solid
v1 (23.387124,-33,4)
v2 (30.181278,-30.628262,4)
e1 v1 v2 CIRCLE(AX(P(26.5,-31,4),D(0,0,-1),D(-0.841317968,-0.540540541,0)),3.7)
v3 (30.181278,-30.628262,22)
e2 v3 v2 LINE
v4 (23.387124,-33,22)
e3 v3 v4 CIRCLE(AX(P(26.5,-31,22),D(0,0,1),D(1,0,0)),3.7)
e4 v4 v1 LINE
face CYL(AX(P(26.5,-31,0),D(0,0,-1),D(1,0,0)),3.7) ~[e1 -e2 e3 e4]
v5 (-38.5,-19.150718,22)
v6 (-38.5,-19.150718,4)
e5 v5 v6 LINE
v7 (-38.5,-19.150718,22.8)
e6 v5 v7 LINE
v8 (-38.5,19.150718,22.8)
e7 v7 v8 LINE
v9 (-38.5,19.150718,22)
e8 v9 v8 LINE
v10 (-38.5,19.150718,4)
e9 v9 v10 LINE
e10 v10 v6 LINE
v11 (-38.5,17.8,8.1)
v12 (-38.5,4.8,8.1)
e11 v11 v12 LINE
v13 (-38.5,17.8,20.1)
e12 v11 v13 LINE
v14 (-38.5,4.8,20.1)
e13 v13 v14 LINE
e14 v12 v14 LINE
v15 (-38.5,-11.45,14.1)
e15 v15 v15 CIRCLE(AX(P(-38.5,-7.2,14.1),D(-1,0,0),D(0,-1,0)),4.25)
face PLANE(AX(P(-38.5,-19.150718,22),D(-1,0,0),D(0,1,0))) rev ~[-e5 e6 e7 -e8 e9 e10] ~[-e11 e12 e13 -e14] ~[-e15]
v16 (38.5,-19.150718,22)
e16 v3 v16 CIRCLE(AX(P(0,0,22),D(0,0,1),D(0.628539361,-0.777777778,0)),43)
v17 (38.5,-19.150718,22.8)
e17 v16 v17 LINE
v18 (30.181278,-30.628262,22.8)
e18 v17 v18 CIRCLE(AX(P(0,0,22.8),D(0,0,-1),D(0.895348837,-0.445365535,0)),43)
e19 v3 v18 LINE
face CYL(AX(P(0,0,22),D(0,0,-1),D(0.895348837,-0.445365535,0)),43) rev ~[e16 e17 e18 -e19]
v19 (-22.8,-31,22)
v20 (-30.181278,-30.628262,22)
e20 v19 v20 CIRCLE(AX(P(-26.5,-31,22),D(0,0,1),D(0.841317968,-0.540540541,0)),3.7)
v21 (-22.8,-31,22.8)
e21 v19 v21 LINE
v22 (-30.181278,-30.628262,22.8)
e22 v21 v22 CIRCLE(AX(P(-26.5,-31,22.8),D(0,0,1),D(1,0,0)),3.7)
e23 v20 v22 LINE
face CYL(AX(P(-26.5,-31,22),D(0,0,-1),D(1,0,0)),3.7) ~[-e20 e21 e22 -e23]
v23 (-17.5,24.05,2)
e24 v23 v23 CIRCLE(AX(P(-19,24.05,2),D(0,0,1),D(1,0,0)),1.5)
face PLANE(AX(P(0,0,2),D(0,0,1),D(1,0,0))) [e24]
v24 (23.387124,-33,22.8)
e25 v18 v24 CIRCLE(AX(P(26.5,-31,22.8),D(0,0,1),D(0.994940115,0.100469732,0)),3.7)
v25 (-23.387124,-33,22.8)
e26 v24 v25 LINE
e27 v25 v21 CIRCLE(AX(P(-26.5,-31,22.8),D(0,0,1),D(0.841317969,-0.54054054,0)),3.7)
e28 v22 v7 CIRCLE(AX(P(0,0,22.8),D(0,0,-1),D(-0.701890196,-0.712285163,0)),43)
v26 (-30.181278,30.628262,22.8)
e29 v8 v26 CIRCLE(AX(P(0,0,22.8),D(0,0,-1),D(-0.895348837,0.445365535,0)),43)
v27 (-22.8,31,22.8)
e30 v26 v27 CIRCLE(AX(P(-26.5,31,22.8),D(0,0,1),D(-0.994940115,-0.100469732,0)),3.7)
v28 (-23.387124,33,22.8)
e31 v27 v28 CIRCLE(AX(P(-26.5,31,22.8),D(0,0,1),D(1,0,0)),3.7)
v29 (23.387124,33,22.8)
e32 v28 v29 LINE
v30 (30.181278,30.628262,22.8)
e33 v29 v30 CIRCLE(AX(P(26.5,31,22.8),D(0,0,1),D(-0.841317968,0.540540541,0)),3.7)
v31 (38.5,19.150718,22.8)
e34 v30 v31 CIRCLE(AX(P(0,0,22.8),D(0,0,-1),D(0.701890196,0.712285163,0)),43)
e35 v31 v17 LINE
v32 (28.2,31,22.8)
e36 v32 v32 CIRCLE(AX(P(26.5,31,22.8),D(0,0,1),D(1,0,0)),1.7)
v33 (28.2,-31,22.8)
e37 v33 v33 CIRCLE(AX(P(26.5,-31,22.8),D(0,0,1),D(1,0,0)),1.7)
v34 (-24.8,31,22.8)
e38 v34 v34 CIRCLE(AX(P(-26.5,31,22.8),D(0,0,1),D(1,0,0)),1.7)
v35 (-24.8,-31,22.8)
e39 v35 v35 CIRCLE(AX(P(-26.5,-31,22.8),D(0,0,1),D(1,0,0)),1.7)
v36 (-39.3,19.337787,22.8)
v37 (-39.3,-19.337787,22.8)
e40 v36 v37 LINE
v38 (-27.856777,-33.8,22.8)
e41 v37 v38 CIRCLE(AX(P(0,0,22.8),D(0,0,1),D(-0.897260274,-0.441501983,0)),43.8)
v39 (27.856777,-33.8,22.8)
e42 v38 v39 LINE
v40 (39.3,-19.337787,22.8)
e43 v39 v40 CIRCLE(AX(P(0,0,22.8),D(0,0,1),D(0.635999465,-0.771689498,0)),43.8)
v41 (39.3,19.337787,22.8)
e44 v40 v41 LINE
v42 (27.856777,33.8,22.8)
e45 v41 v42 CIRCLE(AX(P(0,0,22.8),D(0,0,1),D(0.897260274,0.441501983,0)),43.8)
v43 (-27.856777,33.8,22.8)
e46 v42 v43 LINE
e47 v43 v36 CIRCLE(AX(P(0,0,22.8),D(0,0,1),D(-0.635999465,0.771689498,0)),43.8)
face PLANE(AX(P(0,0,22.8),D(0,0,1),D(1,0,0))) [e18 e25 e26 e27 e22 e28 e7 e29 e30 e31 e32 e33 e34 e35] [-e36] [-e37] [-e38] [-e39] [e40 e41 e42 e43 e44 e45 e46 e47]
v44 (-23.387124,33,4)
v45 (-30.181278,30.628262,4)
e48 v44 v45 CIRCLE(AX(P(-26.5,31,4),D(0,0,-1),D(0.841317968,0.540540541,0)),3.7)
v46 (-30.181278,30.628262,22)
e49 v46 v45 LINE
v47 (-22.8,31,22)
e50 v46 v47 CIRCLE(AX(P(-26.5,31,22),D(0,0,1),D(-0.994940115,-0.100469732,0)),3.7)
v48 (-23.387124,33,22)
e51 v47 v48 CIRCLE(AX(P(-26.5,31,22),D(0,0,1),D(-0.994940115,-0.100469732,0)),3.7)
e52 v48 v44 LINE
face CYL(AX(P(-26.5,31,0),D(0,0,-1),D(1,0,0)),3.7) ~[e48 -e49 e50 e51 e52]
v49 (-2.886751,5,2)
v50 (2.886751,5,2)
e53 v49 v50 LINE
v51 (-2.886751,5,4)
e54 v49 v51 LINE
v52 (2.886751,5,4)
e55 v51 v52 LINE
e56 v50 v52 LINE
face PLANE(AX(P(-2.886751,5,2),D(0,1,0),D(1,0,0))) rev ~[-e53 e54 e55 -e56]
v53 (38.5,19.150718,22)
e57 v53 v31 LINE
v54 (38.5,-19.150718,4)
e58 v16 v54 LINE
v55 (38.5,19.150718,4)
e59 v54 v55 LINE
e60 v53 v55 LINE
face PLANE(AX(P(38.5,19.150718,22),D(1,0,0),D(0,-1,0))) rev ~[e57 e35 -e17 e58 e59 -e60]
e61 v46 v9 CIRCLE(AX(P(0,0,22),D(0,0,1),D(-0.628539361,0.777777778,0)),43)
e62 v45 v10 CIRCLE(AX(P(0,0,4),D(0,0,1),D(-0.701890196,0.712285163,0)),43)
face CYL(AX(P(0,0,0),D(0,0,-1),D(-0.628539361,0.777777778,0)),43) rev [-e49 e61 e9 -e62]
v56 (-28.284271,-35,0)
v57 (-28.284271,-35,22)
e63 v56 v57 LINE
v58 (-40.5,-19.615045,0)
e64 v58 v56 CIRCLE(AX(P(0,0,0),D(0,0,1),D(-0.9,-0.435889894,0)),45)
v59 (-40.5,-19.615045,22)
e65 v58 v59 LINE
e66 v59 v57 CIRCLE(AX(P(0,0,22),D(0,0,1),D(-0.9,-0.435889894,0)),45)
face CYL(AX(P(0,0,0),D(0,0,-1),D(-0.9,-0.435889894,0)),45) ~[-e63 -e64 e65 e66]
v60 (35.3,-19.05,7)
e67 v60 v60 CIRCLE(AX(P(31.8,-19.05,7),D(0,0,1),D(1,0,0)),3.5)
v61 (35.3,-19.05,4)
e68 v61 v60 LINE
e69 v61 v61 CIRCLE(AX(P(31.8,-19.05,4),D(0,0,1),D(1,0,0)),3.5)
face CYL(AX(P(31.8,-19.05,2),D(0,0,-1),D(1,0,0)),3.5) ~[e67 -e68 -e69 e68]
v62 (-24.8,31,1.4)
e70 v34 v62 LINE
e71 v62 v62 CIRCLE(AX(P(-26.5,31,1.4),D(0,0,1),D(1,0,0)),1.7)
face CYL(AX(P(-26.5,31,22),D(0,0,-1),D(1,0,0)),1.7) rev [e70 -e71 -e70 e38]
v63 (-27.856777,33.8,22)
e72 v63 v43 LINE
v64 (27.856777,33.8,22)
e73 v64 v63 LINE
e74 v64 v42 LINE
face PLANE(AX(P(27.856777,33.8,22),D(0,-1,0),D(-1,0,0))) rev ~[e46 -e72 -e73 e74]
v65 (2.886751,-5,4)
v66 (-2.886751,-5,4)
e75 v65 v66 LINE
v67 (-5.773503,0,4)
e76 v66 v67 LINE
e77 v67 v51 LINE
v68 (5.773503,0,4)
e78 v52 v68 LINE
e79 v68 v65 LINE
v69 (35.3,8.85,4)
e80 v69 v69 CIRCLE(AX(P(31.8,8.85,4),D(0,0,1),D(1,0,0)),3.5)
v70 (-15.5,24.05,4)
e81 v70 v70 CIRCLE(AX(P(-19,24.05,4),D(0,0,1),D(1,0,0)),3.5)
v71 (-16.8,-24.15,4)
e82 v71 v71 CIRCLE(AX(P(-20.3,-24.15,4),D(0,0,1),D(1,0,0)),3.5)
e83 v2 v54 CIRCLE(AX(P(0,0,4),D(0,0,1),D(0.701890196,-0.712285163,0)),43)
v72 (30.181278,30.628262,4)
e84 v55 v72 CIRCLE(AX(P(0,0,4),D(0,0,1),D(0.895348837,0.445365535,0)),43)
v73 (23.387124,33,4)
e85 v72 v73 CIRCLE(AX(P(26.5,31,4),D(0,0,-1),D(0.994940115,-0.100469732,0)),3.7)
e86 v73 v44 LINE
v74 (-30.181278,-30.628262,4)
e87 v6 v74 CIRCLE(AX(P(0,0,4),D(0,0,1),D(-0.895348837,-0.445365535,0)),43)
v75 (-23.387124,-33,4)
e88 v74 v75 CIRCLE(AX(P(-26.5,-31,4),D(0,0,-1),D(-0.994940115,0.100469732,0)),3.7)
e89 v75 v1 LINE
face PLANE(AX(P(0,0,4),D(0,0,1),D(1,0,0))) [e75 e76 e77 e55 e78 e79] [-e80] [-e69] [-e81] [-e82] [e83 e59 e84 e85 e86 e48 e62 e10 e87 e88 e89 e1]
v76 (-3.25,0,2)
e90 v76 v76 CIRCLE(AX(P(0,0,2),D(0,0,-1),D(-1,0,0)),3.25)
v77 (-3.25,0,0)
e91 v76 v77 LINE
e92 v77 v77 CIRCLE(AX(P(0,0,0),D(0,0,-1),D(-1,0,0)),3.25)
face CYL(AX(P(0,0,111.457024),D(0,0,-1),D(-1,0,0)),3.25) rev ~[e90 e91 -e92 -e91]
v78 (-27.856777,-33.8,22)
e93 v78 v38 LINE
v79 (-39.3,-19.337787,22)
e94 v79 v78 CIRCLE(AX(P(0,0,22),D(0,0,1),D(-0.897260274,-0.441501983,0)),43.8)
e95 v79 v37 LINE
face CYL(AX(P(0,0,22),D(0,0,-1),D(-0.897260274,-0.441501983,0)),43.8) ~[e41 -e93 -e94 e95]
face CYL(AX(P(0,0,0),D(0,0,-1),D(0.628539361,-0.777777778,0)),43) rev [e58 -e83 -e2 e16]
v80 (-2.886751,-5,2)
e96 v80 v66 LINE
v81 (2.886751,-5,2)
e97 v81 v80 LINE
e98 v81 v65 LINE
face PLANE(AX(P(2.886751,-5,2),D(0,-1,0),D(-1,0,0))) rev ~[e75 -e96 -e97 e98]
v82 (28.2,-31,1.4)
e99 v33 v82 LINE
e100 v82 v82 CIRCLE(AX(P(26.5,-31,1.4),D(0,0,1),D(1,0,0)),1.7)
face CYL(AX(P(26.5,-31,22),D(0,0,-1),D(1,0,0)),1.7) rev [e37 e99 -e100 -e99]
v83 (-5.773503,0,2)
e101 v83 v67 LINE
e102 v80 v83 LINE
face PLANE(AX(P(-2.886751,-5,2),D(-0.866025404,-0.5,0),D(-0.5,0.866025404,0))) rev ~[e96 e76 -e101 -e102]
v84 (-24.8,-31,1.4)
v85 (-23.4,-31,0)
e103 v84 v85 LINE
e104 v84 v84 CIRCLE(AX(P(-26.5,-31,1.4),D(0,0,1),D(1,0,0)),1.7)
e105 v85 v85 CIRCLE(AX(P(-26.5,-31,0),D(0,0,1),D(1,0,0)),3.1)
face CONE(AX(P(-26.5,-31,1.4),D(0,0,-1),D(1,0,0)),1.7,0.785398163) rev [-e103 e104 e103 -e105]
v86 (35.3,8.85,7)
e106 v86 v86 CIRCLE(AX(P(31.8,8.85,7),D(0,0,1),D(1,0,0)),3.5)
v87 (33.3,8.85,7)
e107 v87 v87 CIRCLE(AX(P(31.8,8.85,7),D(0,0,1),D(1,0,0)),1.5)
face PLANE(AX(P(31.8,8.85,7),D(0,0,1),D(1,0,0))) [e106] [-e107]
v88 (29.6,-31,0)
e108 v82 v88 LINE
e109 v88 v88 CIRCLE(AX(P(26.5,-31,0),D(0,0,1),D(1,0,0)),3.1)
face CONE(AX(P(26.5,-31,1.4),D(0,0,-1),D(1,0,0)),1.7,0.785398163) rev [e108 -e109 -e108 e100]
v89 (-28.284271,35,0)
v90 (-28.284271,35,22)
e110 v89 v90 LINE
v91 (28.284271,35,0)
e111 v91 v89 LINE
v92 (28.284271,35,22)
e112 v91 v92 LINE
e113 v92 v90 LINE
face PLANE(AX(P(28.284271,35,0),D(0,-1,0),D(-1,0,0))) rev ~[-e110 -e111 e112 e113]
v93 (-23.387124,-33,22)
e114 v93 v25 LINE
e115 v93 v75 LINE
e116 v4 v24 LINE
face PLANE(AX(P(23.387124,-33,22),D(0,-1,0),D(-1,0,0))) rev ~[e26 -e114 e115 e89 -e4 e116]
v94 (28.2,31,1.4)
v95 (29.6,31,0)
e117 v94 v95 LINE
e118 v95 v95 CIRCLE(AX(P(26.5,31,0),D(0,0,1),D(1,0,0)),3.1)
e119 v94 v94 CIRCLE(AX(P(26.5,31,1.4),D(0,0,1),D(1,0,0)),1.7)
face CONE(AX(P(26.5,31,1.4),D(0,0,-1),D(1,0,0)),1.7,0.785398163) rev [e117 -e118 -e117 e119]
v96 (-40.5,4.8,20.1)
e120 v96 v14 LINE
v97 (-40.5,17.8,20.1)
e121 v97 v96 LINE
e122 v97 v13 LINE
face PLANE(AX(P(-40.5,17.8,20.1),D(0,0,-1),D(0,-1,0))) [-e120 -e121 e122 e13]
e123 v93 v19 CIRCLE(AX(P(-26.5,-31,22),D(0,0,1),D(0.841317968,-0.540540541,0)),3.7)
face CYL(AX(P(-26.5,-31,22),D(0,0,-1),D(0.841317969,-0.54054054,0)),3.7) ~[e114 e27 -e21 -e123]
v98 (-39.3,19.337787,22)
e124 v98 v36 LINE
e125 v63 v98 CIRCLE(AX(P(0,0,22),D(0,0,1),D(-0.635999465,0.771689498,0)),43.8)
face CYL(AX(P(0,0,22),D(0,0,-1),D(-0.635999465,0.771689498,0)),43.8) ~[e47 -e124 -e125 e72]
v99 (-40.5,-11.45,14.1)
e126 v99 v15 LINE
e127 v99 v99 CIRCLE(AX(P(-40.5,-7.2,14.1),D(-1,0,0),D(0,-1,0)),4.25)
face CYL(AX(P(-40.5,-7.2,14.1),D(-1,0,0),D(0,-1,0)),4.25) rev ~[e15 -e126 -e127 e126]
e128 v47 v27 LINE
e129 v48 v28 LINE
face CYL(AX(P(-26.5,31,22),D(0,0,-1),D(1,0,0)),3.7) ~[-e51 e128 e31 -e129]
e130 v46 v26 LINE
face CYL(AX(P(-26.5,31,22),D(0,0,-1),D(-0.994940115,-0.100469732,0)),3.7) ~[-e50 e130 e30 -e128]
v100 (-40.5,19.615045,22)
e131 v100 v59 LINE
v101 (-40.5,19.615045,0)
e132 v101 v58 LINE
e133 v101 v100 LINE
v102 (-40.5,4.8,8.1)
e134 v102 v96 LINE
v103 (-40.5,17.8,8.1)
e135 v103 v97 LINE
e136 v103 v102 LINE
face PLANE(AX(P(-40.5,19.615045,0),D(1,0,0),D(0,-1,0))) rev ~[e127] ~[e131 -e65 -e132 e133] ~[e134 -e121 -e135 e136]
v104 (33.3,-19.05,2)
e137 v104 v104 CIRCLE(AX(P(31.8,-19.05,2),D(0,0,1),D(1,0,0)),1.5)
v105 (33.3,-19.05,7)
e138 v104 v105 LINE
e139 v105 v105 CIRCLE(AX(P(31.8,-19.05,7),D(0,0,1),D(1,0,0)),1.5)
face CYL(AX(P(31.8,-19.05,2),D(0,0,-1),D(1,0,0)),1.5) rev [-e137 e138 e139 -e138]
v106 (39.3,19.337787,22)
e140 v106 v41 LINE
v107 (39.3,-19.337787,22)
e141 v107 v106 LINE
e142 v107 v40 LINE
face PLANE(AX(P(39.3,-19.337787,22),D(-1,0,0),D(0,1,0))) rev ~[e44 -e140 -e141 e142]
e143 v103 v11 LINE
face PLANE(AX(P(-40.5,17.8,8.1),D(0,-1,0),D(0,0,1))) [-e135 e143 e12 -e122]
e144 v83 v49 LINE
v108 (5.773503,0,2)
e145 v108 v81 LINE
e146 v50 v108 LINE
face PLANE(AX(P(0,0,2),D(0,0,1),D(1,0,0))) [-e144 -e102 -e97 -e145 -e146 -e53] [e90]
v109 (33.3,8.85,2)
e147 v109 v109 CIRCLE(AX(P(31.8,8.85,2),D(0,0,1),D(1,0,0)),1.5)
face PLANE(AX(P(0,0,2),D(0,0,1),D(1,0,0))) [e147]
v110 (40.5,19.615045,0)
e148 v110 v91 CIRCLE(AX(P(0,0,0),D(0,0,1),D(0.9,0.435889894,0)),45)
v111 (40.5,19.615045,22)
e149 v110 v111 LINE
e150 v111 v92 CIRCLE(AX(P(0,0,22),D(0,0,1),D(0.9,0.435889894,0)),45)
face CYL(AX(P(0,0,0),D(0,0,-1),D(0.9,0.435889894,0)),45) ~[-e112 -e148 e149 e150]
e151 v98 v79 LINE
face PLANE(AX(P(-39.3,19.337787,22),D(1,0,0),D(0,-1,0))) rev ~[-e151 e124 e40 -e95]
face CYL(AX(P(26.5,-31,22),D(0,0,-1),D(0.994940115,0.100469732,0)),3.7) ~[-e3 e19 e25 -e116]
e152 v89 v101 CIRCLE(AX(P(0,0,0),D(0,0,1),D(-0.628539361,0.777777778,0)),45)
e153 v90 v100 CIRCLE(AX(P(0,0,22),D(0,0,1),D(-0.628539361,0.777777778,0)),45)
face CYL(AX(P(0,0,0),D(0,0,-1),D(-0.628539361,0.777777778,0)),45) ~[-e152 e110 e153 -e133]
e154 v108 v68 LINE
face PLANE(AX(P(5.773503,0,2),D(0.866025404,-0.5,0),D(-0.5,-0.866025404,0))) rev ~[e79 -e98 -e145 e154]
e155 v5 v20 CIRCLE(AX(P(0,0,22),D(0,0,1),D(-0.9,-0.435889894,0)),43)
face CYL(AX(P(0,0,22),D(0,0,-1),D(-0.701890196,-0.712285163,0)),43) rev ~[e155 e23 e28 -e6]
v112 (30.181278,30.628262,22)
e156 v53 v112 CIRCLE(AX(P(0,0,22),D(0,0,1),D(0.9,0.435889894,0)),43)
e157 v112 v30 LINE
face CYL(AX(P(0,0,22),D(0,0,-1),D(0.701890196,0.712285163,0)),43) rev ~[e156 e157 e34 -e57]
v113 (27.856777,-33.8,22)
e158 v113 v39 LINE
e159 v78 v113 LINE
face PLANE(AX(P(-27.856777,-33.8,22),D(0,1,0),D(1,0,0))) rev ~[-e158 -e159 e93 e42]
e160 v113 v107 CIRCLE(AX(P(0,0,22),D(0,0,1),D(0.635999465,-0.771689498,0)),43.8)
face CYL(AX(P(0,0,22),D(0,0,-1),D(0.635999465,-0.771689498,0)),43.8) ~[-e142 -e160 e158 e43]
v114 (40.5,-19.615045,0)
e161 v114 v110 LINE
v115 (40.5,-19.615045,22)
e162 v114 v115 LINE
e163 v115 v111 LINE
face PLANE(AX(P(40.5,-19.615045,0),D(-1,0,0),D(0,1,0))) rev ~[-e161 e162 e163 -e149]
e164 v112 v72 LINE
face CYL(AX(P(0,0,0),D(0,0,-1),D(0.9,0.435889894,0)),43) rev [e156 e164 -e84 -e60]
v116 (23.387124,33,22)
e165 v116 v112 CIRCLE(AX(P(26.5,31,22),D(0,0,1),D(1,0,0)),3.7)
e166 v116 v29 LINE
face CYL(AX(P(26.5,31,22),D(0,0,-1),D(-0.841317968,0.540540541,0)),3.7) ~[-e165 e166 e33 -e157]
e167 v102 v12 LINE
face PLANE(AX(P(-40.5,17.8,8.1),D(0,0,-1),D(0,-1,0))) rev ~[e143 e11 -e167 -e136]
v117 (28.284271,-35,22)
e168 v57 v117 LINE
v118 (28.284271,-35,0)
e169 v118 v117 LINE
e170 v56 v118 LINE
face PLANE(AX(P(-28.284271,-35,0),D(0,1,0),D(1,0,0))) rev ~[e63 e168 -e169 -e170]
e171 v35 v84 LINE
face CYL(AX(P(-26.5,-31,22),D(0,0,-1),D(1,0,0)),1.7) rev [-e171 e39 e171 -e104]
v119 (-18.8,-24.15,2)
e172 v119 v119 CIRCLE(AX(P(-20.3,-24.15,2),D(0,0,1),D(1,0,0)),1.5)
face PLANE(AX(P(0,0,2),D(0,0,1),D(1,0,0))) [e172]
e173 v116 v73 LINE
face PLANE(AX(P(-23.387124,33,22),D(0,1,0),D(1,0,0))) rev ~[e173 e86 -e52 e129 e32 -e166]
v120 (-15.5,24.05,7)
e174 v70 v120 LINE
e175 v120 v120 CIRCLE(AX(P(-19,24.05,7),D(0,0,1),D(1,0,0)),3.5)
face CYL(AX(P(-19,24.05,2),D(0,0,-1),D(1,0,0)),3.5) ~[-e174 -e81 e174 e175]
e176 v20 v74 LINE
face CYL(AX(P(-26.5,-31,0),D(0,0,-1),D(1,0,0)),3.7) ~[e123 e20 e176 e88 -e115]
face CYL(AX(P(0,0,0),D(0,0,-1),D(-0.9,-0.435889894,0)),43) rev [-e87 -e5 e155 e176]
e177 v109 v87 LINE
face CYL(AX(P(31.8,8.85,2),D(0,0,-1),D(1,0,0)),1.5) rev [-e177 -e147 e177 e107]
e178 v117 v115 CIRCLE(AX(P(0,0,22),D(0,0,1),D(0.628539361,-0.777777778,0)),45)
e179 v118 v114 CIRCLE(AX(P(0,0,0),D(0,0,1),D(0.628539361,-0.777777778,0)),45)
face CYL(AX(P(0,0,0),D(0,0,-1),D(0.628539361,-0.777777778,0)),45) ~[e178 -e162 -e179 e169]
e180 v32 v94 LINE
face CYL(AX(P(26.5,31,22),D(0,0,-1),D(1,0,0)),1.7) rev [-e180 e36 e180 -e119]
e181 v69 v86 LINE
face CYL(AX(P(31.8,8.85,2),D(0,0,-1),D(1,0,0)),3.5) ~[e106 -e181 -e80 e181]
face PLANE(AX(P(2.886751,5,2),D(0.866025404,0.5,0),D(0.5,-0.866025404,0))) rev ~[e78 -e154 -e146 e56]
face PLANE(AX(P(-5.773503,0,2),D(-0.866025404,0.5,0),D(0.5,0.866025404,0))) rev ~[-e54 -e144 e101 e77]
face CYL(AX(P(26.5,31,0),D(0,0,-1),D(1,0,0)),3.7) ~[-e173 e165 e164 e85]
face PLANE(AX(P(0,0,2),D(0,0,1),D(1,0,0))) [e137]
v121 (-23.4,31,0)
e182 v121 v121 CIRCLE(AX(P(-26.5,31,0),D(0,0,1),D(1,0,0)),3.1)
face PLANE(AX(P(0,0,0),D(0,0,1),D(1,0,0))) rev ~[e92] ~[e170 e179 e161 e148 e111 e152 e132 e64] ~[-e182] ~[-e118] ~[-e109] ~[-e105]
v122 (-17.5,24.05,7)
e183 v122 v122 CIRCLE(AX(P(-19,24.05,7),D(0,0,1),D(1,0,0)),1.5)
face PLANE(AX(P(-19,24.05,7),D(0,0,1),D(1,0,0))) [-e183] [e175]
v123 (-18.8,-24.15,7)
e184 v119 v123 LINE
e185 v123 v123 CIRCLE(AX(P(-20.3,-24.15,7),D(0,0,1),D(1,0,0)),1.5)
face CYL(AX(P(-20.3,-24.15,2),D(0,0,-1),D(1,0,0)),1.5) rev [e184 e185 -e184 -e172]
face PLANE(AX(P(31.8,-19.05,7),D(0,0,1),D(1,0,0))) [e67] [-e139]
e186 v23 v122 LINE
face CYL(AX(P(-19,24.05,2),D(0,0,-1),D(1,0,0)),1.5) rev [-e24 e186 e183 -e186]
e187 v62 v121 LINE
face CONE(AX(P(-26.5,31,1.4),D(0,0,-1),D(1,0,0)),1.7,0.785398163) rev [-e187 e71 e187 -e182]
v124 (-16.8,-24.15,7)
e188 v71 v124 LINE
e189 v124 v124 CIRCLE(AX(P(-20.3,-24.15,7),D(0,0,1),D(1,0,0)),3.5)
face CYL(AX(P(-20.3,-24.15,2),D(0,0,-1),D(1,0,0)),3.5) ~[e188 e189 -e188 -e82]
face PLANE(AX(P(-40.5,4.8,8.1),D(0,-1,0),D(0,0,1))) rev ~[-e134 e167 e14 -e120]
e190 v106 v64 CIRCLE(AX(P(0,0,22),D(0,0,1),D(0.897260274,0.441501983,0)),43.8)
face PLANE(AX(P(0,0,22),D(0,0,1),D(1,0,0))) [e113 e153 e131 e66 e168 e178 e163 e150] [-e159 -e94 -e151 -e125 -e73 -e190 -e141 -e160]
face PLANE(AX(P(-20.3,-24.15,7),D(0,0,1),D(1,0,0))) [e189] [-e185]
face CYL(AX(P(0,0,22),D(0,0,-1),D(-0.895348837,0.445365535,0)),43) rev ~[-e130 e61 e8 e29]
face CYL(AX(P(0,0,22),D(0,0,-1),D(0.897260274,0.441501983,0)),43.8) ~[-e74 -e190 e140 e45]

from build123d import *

# Parameters (mm, degrees)
F0_R      = 1.7
F1_DEPTH  = 22
F2_T      = -2
F3_SIZE   = 1.4
F4_R      = 1.7
F5_DEPTH  = 0.8
F6_R      = 3.5
F6_R_2    = 1.5
F7_DEPTH  = 5
F8_W      = 13
F8_H      = 12
F8_R      = 4.25
F9_DEPTH  = 2
F10_R     = 3.5
F11_DEPTH = 2
F12_D     = 6.5


# Not quite as in the source:
# - a feature names something its author has since deleted; it is built from what else it names


with BuildPart() as f1:
    # F0 (on Top) → F1 (new body)
    with BuildSketch(Plane.XY):
        with BuildLine():
            Line((-40.5, 19.6150452459), (-40.5, -19.6150452459))
            ThreePointArc((-40.5, -19.6150452459), (-35.2419239111, -27.982258648), (-28.2842712475, -35))
            Line((-28.2842712475, -35), (28.2842712475, -35))
            ThreePointArc((28.2842712475, -35), (35.2419239111, -27.982258648), (40.5, -19.6150452459))
            Line((40.5, -19.6150452459), (40.5, 19.6150452459))
            ThreePointArc((40.5, 19.6150452459), (35.2419239111, 27.982258648), (28.2842712475, 35))
            Line((28.2842712475, 35), (-28.2842712475, 35))
            ThreePointArc((-28.2842712475, 35), (-35.2419239111, 27.982258648), (-40.5, 19.6150452459))
        make_face()
        with Locations((-26.5, -31)):
            Circle(F0_R, mode=Mode.SUBTRACT)
        with Locations((26.5, -31)):
            Circle(F0_R, mode=Mode.SUBTRACT)
        with Locations((-26.5, 31)):
            Circle(F0_R, mode=Mode.SUBTRACT)
        with Locations((26.5, 31)):
            Circle(F0_R, mode=Mode.SUBTRACT)
    extrude(amount=F1_DEPTH)

    # F2
    f2_openings = [f1.faces().sort_by_distance(p)[0] for p in [
        (0, 0, 22),
    ]]
    offset(amount=F2_T, openings=f2_openings)

    # F3
    f3_edges = [f1.edges().sort_by_distance(p)[0] for p in [
        (-28.2, -31, 0),
        (24.8, -31, 0),
        (24.8, 31, 0),
        (-28.2, 31, 0),
    ]]
    chamfer(f3_edges, length=F3_SIZE)

    # F4 (on face) → F5 (join)
    with BuildSketch(Plane.XY.offset(22)):
        with BuildLine():
            Line((27.8567765544, 33.8), (-27.8567765544, 33.8))
            ThreePointArc((-27.8567765544, 33.8), (-34.3481740656, 27.1779862823), (-39.3, 19.3377868434))
            Line((-39.3, 19.3377868434), (-39.3, -19.3377868434))
            ThreePointArc((-39.3, -19.3377868434), (-34.3481740656, -27.1779862823), (-27.8567765544, -33.8))
            Line((-27.8567765544, -33.8), (27.8567765544, -33.8))
            ThreePointArc((27.8567765544, -33.8), (34.3481740656, -27.1779862823), (39.3, -19.3377868434))
            Line((39.3, -19.3377868434), (39.3, 19.3377868434))
            ThreePointArc((39.3, 19.3377868434), (34.3481740656, 27.1779862823), (27.8567765544, 33.8))
        make_face()
        with Locations((-26.5, -31)):
            Circle(F4_R, mode=Mode.SUBTRACT)
        with Locations((26.5, -31)):
            Circle(F4_R, mode=Mode.SUBTRACT)
        with Locations((-26.5, 31)):
            Circle(F4_R, mode=Mode.SUBTRACT)
        with BuildLine():
            ThreePointArc((30.1812784263, -30.6282619904), (25.2805511537, -27.5067286806), (23.3871235167, -33))
            Line((23.3871235167, -33), (-23.3871235167, -33))
            ThreePointArc((-23.3871235167, -33), (-22.949813879, -32.0421988802), (-22.8, -31))
            ThreePointArc((-22.8, -31), (-26.3138954292, -27.3046833574), (-30.1812784263, -30.6282619904))
            ThreePointArc((-30.1812784263, -30.6282619904), (-34.8168494492, -25.2346387815), (-38.5, -19.1507180022))
            Line((-38.5, -19.1507180022), (-38.5, 19.1507180022))
            ThreePointArc((-38.5, 19.1507180022), (-34.8168494492, 25.2346387815), (-30.1812784263, 30.6282619904))
            ThreePointArc((-30.1812784263, 30.6282619904), (-26.3138954292, 27.3046833574), (-22.8, 31))
            ThreePointArc((-22.8, 31), (-22.949813879, 32.0421988802), (-23.3871235167, 33))
            Line((-23.3871235167, 33), (23.3871235167, 33))
            ThreePointArc((23.3871235167, 33), (25.2805511537, 27.5067286806), (30.1812784263, 30.6282619904))
            ThreePointArc((30.1812784263, 30.6282619904), (34.8168494492, 25.2346387815), (38.5, 19.1507180022))
            Line((38.5, 19.1507180022), (38.5, -19.1507180022))
            ThreePointArc((38.5, -19.1507180022), (34.8168494492, -25.2346387815), (30.1812784263, -30.6282619904))
        make_face(mode=Mode.SUBTRACT)
        with Locations((26.5, 31)):
            Circle(F4_R, mode=Mode.SUBTRACT)
    extrude(amount=F5_DEPTH)

    # F6 (on face) → F7 (join)
    with BuildSketch(Plane.XY.offset(2)):
        with Locations((-19, 24.05)):
            Circle(F6_R)
        with Locations((-19, 24.05)):
            Circle(F6_R_2, mode=Mode.SUBTRACT)
        with Locations((31.8, 8.85)):
            Circle(F6_R)
        with Locations((31.8, 8.85)):
            Circle(F6_R_2, mode=Mode.SUBTRACT)
        with Locations((31.8, -19.05)):
            Circle(F6_R)
        with Locations((31.8, -19.05)):
            Circle(F6_R_2, mode=Mode.SUBTRACT)
        with Locations((-20.3, -24.15)):
            Circle(F6_R)
        with Locations((-20.3, -24.15)):
            Circle(F6_R_2, mode=Mode.SUBTRACT)
    extrude(amount=F7_DEPTH)

    # F8 (on face) → F9 (cut, through all)
    with BuildSketch(Plane(origin=(-40.5, 0, 0), x_dir=(0, -1, 0), z_dir=(-1, 0, 0))):
        with Locations((-11.3, 14.1)):
            Rectangle(F8_W, F8_H)
        with Locations((7.2, 14.1)):
            Circle(F8_R)
    extrude(amount=-F9_DEPTH, mode=Mode.SUBTRACT)

    # F10 (on face) → F11 (join)
    with BuildSketch(Plane.XY.offset(2)):
        with BuildLine():
            ThreePointArc((-23.3871235167, 33), (-25.2805511537, 27.5067286806), (-30.1812784263, 30.6282619904))
            ThreePointArc((-30.1812784263, 30.6282619904), (-34.8168494492, 25.2346387815), (-38.5, 19.1507180022))
            Line((-38.5, 19.1507180022), (-38.5, -19.1507180022))
            ThreePointArc((-38.5, -19.1507180022), (-34.8168494492, -25.2346387815), (-30.1812784263, -30.6282619904))
            ThreePointArc((-30.1812784263, -30.6282619904), (-25.2805511537, -27.5067286806), (-23.3871235167, -33))
            Line((-23.3871235167, -33), (23.3871235167, -33))
            ThreePointArc((23.3871235167, -33), (25.2805511537, -27.5067286806), (30.1812784263, -30.6282619904))
            ThreePointArc((30.1812784263, -30.6282619904), (34.8168494492, -25.2346387815), (38.5, -19.1507180022))
            Line((38.5, -19.1507180022), (38.5, 19.1507180022))
            ThreePointArc((38.5, 19.1507180022), (34.8168494492, 25.2346387815), (30.1812784263, 30.6282619904))
            ThreePointArc((30.1812784263, 30.6282619904), (25.2805511537, 27.5067286806), (23.3871235167, 33))
            Line((23.3871235167, 33), (-23.3871235167, 33))
        make_face()
        with Locations((-20.3, -24.15)):
            Circle(F10_R, mode=Mode.SUBTRACT)
        with Locations((31.8, -19.05)):
            Circle(F10_R, mode=Mode.SUBTRACT)
        with Locations((-19, 24.05)):
            Circle(F10_R, mode=Mode.SUBTRACT)
        Polygon((-5.7735026919, 0), (-2.8867513459, 5), (2.8867513459, 5), (5.7735026919, 0), (2.8867513459, -5), (-2.8867513459, -5), align=None, mode=Mode.SUBTRACT)
        with Locations((31.8, 8.85)):
            Circle(F10_R, mode=Mode.SUBTRACT)
    extrude(amount=F11_DEPTH)

    # F12 (through all)
    with Locations(Plane.XY.offset(2)):
        with Locations((0, 0)):
            Hole(F12_D / 2)


solid = f1.part
